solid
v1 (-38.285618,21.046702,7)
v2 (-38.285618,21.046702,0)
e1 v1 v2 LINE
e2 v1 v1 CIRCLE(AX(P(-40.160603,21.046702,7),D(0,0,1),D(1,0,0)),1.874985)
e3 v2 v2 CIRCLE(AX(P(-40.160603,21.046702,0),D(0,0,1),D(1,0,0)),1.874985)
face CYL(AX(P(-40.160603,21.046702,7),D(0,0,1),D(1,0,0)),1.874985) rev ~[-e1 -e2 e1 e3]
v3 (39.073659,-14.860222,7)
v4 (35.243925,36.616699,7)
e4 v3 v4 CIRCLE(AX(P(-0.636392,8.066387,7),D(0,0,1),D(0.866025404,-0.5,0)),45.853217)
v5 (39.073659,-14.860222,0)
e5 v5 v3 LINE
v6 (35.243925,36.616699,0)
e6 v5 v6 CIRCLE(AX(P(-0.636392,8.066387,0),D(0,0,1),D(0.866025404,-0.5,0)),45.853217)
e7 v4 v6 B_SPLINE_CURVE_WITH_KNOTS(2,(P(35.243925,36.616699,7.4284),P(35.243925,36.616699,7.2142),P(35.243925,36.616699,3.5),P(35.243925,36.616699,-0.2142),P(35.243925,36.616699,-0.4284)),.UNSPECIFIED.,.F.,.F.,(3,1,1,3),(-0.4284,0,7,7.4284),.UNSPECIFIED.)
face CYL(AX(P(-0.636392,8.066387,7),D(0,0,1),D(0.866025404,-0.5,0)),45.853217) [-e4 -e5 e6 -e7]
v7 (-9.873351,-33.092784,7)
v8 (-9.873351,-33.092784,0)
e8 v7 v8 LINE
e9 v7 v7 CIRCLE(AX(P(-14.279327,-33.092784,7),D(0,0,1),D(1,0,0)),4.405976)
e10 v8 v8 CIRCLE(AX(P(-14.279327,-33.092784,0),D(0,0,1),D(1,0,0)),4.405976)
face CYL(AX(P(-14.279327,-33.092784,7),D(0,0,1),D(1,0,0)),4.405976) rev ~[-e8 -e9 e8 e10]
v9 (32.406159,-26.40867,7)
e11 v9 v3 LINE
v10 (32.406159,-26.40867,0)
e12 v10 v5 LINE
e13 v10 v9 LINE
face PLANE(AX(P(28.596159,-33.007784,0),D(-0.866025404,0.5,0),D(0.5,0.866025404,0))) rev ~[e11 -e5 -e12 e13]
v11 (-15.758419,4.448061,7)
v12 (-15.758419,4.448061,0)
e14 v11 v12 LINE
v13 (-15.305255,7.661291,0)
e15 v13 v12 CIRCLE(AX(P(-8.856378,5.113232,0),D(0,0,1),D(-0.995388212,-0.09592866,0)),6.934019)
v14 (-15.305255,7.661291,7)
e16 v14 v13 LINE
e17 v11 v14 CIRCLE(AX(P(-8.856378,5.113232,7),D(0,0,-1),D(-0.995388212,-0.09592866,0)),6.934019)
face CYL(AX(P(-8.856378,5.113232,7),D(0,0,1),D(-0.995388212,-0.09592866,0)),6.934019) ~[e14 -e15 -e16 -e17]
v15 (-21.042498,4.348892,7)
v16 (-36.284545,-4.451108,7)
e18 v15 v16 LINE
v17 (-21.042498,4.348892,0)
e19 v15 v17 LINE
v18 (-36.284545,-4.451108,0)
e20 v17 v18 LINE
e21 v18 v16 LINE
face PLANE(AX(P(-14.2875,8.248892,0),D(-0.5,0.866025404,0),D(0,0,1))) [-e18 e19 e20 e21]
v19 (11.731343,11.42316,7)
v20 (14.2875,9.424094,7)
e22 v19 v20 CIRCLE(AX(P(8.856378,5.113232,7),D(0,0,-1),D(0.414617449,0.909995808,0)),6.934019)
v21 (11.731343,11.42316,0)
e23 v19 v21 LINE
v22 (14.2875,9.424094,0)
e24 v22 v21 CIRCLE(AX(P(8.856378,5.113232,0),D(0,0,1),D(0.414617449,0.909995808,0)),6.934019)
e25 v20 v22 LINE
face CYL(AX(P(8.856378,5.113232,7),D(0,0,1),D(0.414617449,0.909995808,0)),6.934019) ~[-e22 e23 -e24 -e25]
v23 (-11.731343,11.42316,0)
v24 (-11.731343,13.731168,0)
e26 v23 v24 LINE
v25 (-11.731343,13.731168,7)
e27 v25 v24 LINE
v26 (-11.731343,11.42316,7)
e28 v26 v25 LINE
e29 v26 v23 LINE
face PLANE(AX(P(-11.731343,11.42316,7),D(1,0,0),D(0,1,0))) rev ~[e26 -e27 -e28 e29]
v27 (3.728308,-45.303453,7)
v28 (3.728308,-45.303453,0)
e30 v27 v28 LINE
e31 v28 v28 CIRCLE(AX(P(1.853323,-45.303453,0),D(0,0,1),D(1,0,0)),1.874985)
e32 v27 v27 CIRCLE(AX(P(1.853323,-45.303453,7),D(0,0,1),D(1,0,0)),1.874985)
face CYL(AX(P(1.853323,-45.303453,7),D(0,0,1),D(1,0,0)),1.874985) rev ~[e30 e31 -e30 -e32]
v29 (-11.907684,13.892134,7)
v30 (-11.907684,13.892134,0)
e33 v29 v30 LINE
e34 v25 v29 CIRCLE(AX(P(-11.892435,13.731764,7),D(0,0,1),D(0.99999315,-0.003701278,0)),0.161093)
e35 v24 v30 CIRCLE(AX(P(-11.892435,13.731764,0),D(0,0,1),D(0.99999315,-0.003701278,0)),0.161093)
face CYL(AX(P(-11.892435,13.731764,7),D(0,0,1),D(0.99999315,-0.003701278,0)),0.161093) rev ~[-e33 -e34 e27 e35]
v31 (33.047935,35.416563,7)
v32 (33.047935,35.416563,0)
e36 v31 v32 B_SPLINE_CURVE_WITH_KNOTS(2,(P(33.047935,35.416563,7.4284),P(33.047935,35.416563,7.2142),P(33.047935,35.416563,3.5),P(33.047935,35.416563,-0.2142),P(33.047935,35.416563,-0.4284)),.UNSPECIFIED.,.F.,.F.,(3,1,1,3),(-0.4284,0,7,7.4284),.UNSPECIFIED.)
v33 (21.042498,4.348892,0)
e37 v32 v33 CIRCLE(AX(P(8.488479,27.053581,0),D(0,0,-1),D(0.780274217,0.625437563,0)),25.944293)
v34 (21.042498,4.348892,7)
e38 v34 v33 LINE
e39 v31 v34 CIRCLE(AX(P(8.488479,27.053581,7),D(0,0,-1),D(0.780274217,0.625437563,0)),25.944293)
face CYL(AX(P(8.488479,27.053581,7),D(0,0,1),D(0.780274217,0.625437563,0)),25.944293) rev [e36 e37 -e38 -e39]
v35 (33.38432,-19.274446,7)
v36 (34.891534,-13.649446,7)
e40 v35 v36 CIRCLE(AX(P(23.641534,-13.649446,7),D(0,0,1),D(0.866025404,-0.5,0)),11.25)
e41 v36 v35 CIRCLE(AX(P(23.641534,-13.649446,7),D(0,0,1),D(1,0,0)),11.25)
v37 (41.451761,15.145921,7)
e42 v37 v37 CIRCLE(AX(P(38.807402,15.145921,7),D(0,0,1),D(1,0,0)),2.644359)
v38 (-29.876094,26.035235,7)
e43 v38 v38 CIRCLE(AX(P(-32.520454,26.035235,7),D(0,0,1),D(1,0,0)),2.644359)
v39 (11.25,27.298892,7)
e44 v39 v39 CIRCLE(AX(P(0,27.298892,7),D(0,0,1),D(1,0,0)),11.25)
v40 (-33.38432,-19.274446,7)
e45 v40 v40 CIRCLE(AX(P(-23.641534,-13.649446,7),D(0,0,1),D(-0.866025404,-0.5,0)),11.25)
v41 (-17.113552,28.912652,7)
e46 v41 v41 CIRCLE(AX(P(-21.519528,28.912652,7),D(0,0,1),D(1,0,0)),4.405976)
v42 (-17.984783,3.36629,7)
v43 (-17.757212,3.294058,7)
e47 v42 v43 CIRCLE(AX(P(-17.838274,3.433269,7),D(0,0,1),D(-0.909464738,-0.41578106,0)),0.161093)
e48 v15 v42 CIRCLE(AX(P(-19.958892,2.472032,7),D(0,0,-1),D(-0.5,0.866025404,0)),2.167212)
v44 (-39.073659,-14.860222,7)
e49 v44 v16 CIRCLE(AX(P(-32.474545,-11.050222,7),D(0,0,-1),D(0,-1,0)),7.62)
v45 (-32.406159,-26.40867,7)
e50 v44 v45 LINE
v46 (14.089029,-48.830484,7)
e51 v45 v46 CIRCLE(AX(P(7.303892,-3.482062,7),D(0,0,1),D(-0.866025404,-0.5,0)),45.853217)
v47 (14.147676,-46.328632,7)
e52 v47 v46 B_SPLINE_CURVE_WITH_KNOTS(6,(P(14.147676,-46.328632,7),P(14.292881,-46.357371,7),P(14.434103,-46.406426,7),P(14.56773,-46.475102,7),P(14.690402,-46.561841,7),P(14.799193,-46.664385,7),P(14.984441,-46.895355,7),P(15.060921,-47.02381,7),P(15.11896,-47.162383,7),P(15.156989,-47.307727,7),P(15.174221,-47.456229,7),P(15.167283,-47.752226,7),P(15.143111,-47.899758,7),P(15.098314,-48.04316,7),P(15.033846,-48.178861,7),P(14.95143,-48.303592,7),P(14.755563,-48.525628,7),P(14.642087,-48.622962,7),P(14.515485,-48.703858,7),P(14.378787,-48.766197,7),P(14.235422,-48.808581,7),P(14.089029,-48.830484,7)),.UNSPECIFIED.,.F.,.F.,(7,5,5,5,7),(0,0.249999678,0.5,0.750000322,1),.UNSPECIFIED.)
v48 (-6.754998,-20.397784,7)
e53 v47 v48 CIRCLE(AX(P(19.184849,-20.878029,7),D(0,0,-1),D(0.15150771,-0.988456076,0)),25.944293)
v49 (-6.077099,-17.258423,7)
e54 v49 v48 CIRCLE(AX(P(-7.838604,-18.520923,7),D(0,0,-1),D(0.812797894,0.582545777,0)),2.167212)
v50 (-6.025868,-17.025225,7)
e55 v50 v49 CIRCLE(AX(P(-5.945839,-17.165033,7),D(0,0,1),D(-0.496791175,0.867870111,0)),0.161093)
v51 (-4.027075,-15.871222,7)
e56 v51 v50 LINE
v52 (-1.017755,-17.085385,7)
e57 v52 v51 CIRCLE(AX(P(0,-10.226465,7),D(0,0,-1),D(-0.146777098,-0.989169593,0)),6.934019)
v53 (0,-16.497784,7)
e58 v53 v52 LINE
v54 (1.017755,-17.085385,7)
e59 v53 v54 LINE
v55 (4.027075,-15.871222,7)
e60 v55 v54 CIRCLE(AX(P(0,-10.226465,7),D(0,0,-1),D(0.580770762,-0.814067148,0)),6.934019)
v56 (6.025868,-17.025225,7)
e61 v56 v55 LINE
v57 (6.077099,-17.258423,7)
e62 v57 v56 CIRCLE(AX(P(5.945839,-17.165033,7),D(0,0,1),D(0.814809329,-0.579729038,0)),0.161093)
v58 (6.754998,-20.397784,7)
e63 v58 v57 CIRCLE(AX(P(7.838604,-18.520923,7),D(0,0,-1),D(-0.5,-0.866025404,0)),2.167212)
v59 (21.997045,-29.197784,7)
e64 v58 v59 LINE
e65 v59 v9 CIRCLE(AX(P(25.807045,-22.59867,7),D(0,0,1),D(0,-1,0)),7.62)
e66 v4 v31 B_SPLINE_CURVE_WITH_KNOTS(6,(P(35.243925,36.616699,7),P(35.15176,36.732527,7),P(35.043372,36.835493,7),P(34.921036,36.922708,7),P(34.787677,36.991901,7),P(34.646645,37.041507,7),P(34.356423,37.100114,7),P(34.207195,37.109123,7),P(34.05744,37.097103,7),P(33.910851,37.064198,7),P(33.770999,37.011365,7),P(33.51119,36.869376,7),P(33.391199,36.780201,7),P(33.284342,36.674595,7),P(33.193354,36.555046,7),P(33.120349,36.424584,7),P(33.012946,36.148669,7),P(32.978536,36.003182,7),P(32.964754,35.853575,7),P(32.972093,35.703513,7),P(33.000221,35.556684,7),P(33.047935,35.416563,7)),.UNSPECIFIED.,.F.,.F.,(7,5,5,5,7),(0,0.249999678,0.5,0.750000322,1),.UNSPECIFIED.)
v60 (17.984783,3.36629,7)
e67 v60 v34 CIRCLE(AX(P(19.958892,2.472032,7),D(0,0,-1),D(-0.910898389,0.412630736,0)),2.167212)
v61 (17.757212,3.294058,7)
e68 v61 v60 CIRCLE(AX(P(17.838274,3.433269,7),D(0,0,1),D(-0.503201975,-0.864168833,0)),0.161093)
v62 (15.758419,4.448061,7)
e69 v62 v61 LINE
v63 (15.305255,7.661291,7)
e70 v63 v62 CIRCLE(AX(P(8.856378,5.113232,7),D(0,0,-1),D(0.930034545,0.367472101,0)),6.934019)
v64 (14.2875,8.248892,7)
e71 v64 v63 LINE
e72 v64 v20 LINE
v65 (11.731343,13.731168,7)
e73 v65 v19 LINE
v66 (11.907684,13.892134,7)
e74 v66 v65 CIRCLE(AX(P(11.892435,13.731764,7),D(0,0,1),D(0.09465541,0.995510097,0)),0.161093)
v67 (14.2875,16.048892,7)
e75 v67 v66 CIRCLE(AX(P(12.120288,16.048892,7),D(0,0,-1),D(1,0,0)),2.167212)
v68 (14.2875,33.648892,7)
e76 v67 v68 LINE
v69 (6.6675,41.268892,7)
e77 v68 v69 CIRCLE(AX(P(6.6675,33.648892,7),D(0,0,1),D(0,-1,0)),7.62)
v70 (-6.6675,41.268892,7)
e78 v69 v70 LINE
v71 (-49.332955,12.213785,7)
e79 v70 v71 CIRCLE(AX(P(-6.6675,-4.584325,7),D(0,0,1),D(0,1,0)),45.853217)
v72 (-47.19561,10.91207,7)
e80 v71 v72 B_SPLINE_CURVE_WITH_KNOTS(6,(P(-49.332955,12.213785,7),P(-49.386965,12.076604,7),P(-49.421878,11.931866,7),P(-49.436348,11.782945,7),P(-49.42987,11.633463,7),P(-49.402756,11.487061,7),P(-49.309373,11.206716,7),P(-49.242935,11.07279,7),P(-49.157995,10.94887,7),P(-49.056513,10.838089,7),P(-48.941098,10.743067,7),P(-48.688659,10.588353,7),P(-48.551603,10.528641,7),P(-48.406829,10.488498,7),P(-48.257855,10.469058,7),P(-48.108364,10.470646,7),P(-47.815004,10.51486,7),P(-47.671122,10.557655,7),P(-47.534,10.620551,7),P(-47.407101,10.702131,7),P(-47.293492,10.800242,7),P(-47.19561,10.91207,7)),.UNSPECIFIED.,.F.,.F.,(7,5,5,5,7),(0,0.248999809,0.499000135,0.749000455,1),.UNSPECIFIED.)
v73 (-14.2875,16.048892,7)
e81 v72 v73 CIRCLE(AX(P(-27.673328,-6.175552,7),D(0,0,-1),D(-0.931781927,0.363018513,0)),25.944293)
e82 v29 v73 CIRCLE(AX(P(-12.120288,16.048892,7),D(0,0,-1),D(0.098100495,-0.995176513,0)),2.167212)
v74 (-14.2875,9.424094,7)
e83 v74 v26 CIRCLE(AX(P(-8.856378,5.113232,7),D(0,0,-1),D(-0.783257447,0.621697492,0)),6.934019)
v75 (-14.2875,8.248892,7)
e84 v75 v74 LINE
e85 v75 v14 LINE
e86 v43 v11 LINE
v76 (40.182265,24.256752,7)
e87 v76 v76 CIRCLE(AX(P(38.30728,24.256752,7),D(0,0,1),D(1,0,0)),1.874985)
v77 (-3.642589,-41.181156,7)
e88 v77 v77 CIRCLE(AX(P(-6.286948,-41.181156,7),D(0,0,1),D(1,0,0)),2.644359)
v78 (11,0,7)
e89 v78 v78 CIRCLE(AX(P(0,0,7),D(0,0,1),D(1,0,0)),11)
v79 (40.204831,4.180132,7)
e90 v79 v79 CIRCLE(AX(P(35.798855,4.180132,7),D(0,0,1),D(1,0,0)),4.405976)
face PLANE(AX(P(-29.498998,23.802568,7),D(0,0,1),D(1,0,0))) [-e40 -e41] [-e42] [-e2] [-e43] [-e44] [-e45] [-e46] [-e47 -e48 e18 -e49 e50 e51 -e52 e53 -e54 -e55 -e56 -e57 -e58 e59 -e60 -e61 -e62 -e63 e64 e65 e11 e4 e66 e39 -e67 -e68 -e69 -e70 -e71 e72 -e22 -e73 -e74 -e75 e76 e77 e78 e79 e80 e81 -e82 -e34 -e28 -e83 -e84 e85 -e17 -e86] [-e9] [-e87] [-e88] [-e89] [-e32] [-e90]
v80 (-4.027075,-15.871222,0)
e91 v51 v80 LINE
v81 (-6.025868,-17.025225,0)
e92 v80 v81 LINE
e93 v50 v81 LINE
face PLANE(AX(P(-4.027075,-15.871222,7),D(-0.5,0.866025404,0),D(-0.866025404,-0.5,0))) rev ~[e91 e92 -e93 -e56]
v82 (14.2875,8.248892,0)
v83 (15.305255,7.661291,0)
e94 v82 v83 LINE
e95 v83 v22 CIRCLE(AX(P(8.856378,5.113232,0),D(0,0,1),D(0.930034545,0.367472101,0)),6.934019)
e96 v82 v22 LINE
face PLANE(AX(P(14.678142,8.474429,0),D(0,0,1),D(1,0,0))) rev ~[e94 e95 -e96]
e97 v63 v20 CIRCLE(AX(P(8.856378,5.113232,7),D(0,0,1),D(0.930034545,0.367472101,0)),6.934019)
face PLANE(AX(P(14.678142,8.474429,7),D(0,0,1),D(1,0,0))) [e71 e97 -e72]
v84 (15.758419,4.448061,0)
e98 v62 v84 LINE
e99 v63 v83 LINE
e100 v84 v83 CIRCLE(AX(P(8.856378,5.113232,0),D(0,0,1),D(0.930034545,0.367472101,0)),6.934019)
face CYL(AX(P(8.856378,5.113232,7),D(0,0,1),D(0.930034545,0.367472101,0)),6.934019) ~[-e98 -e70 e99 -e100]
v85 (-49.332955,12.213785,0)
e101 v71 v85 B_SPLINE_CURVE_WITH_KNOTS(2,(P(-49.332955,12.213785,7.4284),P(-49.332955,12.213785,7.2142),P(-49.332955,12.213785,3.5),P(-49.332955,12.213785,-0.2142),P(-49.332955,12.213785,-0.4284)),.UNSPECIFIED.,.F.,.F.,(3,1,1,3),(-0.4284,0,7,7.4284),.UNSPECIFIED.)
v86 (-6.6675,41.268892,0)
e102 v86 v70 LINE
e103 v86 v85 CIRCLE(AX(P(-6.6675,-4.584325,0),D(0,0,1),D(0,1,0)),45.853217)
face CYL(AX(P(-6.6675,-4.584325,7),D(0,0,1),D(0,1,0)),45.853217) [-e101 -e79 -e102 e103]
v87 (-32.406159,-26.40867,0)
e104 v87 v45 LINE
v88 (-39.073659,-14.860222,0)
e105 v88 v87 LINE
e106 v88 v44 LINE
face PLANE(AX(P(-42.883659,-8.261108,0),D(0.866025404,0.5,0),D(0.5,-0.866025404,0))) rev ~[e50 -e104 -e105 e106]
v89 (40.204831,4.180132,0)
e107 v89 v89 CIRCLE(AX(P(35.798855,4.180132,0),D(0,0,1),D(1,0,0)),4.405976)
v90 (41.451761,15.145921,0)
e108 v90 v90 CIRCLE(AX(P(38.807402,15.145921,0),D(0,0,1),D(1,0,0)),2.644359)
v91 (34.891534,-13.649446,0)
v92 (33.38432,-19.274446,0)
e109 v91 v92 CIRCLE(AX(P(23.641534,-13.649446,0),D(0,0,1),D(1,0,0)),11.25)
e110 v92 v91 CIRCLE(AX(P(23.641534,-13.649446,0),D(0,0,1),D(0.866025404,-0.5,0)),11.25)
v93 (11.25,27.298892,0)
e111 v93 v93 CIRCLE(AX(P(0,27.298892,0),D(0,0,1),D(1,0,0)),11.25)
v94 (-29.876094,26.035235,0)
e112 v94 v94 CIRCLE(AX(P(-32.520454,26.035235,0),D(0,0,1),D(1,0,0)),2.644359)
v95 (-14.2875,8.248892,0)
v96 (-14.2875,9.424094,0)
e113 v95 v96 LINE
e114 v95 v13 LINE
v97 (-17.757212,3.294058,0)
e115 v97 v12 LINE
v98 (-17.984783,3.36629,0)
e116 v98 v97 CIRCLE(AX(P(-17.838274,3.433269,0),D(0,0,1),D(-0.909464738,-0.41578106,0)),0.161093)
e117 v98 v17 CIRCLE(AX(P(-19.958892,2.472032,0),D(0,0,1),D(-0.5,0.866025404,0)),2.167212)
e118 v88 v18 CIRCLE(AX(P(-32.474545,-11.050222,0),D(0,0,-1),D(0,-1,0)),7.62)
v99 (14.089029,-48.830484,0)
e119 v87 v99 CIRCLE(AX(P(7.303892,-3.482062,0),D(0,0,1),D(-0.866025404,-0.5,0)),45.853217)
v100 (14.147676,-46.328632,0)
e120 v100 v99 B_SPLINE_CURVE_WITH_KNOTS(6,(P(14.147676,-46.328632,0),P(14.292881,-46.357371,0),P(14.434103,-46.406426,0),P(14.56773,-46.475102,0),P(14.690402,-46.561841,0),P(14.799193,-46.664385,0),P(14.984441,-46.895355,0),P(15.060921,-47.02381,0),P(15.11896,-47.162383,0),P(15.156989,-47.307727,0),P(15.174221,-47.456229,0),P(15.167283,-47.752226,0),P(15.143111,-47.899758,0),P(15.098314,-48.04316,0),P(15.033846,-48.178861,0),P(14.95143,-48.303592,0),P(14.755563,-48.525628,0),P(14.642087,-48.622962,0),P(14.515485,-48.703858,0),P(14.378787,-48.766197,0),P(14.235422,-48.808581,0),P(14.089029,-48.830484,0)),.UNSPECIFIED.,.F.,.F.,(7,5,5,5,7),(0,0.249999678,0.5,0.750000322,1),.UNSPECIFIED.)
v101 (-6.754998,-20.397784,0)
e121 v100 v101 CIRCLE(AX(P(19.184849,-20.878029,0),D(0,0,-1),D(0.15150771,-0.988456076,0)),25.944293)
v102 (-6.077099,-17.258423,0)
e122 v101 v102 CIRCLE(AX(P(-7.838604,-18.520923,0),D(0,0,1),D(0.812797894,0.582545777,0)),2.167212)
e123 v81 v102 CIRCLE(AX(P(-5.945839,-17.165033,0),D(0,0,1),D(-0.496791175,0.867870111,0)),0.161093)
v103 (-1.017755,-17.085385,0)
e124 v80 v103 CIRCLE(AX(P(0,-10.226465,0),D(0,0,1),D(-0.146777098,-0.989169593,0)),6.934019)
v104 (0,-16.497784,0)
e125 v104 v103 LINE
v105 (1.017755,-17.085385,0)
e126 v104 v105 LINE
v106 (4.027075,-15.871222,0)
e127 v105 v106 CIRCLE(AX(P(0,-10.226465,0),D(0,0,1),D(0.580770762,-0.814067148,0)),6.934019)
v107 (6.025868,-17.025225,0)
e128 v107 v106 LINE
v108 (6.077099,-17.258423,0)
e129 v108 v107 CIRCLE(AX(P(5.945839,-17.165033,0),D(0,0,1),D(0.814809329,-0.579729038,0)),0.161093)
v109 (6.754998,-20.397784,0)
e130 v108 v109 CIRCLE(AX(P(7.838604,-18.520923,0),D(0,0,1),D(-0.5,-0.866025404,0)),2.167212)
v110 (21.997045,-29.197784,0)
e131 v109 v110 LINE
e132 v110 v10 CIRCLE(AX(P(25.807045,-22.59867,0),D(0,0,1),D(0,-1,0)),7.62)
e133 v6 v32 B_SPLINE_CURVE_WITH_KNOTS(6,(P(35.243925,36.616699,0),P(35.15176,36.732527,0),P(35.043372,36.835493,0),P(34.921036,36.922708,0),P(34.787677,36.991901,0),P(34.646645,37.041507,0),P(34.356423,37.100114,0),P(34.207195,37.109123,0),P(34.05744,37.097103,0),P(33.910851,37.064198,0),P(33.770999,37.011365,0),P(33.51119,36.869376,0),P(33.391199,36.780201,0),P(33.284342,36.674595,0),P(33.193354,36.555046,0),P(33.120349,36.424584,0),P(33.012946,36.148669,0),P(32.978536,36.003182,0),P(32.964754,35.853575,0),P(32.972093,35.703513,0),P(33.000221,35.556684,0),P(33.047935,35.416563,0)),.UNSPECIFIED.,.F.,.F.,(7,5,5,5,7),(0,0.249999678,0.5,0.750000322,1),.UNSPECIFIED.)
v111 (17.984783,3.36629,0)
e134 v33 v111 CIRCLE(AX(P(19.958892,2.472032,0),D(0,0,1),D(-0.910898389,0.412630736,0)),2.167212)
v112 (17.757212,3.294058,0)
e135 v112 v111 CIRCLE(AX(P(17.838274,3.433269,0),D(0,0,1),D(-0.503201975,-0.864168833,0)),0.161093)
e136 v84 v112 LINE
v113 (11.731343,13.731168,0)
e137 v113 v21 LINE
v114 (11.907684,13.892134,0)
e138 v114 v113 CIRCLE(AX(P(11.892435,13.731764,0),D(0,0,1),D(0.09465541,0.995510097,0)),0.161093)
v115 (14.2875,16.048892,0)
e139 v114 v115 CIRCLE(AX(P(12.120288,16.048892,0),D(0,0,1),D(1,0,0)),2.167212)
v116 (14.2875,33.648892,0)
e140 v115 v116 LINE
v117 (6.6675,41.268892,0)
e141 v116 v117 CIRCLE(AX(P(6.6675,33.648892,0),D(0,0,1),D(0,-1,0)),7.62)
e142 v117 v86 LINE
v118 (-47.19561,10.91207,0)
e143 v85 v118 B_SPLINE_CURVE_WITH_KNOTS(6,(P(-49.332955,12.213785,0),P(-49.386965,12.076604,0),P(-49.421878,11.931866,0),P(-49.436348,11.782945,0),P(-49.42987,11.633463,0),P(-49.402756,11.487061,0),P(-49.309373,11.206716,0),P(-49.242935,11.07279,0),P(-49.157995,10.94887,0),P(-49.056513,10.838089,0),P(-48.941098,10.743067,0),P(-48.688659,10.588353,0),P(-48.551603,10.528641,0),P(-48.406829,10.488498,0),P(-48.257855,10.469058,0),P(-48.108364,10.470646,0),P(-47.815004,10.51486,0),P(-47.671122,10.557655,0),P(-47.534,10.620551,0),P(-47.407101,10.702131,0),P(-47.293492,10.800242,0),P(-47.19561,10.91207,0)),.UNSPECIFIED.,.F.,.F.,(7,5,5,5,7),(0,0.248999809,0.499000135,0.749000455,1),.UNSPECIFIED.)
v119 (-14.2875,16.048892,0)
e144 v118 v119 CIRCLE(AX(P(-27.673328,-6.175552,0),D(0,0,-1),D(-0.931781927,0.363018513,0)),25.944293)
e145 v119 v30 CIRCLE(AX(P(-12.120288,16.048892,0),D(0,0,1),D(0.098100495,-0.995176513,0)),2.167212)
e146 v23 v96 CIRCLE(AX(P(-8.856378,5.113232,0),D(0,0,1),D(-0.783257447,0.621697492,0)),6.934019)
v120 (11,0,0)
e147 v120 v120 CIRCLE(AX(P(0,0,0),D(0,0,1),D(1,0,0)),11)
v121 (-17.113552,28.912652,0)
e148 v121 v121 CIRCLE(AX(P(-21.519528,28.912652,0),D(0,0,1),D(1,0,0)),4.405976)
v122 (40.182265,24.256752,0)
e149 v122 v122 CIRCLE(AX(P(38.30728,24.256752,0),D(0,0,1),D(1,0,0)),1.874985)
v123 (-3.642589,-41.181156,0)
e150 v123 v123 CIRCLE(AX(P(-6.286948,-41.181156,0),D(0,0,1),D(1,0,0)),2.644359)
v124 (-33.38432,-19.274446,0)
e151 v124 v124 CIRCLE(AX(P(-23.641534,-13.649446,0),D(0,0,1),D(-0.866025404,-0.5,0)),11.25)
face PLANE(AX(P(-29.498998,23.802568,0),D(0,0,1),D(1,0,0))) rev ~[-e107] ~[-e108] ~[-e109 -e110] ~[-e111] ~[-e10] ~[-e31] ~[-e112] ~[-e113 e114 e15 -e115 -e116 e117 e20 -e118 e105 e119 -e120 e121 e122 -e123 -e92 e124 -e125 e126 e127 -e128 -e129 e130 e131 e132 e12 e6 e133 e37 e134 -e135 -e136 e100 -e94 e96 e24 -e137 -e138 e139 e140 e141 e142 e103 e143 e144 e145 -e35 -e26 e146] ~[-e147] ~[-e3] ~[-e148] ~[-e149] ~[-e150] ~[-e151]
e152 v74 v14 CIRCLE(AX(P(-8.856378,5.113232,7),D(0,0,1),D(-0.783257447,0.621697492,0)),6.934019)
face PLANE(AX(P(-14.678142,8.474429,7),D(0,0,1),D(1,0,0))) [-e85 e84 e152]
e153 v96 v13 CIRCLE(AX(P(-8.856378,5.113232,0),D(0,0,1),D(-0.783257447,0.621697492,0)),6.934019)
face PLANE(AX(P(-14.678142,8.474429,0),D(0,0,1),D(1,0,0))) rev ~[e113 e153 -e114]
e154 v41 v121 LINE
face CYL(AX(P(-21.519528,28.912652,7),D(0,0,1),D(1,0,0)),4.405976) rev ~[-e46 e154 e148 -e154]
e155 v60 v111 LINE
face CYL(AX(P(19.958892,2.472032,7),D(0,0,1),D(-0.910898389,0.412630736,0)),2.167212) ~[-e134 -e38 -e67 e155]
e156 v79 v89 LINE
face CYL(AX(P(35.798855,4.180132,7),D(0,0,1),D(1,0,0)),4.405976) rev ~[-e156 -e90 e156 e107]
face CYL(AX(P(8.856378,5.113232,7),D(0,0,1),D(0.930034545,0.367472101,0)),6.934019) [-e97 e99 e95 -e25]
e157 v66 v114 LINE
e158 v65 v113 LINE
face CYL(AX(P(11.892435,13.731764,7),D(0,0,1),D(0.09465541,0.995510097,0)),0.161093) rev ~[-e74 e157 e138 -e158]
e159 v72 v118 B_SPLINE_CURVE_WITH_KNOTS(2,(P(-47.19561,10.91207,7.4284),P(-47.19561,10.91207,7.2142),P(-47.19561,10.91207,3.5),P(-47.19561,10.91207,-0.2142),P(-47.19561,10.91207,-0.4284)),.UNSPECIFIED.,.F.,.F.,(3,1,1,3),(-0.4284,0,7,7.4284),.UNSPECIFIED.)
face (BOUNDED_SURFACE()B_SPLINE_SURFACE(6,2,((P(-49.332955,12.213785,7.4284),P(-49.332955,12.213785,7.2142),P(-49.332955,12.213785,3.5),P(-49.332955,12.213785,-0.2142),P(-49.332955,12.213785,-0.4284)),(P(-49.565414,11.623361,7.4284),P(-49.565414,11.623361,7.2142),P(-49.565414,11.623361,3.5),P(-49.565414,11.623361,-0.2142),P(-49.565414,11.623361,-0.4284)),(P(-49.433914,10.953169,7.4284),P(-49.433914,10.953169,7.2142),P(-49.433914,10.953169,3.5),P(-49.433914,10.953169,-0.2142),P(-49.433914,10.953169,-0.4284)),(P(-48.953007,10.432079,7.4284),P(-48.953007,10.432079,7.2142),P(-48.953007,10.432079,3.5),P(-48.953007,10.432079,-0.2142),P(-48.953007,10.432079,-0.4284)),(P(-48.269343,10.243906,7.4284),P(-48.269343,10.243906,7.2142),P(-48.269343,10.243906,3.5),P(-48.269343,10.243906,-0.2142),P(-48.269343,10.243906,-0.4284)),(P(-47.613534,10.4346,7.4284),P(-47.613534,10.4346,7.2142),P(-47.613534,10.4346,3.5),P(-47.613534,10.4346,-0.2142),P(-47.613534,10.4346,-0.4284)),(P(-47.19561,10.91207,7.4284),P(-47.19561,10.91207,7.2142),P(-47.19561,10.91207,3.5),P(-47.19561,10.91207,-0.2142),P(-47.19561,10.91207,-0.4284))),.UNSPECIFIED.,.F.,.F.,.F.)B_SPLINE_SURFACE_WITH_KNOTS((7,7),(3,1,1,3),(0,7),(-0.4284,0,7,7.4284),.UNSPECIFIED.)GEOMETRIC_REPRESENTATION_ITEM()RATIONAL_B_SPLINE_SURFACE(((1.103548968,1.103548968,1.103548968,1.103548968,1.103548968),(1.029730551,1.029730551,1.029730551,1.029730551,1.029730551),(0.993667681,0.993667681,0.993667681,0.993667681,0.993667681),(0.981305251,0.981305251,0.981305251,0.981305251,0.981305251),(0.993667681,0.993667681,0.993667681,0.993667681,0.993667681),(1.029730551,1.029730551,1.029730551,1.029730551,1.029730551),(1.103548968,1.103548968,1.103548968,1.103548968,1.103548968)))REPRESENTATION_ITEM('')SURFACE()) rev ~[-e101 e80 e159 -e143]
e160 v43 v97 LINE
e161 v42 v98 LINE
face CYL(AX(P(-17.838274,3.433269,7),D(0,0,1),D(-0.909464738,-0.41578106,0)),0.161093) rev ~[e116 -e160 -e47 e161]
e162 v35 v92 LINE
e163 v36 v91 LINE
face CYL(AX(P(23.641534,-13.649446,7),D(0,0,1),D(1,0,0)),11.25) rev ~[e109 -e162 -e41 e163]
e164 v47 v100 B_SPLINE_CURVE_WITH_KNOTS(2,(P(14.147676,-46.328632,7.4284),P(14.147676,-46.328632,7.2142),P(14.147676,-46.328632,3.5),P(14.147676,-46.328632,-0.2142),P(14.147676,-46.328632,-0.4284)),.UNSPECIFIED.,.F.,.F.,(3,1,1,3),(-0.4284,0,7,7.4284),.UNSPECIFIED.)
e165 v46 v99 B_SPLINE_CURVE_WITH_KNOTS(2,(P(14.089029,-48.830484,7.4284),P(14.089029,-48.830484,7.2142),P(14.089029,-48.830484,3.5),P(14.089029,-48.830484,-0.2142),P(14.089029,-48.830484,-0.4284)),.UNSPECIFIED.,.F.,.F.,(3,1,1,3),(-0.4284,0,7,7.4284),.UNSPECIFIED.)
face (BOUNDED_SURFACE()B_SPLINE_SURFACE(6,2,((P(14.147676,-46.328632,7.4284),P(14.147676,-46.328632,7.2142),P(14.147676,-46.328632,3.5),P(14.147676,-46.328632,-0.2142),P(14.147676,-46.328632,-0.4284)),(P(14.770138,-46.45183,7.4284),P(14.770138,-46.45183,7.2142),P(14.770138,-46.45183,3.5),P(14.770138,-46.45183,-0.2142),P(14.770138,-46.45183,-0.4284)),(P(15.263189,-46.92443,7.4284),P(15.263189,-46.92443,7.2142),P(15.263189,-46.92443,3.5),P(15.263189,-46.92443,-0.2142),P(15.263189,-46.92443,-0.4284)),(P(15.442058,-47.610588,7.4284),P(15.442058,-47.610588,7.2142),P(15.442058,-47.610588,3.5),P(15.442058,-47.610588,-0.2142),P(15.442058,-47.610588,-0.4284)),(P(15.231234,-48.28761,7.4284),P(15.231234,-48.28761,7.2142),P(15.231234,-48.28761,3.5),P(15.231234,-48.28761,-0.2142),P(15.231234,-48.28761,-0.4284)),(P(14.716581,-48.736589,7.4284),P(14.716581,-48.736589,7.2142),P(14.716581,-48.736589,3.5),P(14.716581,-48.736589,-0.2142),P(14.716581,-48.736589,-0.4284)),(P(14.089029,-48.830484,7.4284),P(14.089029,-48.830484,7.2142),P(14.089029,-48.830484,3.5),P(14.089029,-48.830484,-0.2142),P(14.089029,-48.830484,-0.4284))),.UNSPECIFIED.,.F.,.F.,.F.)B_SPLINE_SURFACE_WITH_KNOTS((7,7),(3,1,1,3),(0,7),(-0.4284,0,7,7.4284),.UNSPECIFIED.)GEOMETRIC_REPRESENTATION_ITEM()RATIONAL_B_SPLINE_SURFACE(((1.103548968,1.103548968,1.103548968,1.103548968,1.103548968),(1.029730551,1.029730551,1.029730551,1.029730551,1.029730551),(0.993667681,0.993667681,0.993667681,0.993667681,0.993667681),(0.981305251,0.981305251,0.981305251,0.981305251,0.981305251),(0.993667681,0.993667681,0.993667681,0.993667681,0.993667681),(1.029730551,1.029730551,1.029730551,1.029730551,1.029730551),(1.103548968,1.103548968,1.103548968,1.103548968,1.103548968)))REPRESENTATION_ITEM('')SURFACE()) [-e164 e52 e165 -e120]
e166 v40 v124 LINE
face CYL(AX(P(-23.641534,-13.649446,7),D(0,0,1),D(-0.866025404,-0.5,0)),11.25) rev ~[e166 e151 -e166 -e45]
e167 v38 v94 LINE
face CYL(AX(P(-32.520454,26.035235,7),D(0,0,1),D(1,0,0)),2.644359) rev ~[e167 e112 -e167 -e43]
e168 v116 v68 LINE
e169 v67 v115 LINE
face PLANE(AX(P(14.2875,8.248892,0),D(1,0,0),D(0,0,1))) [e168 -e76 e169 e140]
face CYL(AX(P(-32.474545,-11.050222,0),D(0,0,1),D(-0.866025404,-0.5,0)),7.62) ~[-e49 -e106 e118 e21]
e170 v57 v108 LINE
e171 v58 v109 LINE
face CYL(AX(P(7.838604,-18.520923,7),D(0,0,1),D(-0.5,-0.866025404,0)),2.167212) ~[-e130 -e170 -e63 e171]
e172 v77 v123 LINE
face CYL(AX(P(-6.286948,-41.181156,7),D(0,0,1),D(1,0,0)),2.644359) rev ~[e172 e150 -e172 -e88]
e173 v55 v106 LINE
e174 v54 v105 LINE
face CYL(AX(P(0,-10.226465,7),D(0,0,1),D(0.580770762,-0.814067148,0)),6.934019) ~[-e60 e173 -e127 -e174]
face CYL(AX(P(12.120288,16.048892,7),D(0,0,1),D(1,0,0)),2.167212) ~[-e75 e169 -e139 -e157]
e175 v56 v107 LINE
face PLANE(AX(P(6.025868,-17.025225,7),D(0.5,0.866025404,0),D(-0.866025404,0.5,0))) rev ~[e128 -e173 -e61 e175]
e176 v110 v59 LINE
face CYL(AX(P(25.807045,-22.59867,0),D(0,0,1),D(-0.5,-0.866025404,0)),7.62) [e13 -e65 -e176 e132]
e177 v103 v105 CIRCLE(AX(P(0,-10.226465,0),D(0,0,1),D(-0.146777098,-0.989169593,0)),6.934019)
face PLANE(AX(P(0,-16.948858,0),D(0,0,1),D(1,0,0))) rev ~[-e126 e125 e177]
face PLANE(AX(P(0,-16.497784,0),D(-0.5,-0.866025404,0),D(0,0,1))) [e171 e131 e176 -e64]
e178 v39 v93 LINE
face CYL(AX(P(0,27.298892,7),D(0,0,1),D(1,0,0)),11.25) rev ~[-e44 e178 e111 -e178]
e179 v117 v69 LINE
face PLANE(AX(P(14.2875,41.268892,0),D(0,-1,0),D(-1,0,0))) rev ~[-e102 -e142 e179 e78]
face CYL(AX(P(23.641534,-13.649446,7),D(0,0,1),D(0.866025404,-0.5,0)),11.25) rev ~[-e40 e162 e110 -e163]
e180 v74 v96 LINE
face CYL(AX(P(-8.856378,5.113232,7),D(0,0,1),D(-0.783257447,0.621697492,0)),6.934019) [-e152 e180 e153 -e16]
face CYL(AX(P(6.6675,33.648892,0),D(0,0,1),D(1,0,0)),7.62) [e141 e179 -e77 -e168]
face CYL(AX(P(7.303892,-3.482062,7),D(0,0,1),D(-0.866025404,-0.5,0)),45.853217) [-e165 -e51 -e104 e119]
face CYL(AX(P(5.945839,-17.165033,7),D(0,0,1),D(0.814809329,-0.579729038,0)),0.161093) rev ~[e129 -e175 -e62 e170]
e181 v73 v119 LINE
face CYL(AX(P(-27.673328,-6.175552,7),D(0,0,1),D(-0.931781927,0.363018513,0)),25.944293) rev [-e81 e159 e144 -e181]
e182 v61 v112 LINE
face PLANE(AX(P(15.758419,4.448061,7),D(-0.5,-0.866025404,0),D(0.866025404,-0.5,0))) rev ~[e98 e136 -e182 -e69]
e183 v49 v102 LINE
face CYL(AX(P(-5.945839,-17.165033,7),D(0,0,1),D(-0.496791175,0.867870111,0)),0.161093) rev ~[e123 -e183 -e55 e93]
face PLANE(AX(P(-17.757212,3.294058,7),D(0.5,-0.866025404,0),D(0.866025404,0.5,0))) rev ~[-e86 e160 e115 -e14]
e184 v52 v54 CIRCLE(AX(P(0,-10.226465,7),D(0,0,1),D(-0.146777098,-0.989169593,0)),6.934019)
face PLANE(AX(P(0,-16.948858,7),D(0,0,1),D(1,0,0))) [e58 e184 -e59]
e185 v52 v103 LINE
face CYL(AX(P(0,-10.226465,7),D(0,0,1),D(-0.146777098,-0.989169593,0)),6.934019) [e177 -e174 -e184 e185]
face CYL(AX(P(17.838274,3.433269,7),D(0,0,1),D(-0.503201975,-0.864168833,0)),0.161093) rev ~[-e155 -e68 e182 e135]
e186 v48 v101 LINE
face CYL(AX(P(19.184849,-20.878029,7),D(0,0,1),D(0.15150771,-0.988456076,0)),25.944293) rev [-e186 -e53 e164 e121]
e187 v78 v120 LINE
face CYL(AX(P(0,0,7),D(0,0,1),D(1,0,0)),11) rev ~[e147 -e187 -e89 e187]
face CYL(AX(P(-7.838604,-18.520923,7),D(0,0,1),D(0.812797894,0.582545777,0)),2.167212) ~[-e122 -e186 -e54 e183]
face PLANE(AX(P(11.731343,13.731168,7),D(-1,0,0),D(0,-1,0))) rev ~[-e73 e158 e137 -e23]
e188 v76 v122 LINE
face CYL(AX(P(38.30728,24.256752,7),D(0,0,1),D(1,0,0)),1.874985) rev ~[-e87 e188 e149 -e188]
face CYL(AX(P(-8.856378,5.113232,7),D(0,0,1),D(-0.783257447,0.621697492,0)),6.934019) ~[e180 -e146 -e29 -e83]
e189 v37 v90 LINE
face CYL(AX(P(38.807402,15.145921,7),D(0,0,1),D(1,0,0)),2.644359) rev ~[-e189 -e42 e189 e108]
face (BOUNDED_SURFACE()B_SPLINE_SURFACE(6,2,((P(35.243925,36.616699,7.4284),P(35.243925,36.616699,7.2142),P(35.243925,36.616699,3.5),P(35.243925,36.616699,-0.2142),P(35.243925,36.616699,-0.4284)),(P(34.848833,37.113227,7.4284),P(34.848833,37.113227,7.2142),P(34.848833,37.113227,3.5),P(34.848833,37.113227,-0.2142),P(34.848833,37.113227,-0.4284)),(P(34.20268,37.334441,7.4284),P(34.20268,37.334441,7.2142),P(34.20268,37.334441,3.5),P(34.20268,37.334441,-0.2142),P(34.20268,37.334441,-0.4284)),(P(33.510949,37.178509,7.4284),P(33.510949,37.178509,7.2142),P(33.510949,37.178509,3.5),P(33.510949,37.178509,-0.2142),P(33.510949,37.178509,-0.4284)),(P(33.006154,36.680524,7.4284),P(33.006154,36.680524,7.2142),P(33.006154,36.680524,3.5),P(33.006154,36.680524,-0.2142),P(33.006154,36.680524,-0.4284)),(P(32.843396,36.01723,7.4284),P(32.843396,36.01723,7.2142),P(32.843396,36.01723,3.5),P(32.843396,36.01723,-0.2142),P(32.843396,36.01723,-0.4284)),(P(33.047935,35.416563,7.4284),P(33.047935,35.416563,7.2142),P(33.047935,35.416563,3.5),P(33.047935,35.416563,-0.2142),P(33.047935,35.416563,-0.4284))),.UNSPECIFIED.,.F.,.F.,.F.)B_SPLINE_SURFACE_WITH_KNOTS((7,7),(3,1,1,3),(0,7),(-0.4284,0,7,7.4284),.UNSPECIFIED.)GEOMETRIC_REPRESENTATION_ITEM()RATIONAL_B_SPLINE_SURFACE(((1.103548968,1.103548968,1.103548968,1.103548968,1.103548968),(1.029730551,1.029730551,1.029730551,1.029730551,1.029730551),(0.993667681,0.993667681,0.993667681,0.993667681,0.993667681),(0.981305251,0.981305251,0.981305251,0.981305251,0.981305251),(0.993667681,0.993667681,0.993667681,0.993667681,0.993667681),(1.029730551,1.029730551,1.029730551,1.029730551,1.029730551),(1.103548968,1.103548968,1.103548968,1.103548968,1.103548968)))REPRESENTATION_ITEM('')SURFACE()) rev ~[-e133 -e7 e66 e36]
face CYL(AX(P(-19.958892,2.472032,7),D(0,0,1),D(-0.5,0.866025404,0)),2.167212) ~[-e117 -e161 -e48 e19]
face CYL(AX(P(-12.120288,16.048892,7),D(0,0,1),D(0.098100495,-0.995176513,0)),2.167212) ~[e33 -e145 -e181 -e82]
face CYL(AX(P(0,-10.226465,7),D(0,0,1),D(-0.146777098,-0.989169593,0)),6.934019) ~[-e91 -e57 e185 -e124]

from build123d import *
from build123d import SkipClean  # not in build123d's __all__

# Parameters (mm, degrees)
F1_DEPTH  = 7
F2_DEPTH  = 33.02
F3_DEPTH  = 33.02
F4_DEPTH  = 33.02
F6_R      = 7.62
F5_R      = 11.25
F5_R_2    = 11
F7_DEPTH  = 25.4
F8_R      = 1.8749848785
F8_R_2    = 2.6443594024
F8_R_3    = 4.4059759684
F9_DEPTH  = 7
F10_R     = 1.27
F12_DEPTH = 25.4
F13_DEPTH = 7


with BuildPart() as f1:
    # F0 (on Top) → F1 (new body)
    with BuildSketch(Plane.XY):
        Polygon((14.2875, 8.248891971), (-14.2875, 8.248891971), (0, -16.4977839421), align=None)
    extrude(amount=F1_DEPTH)

    # F2 (add): a face of the model
    f2_faces = [f1.faces().sort_by_distance(p)[0] for p in [
        (-7.14375, -4.1244459855, 3.5),
    ]]
    extrude(f2_faces, amount=F2_DEPTH)

    # F3 (add): a face of the model
    f3_faces = [f1.faces().sort_by_distance(p)[0] for p in [
        (0, 8.248891971, 3.5),
    ]]
    extrude(f3_faces, amount=F3_DEPTH)

    # F4 (add): a face of the model
    f4_faces = [f1.faces().sort_by_distance(p)[0] for p in [
        (7.14375, -4.1244459855, 3.5),
    ]]
    extrude(f4_faces, amount=F4_DEPTH)

    # F6
    f6_edges = [f1.edges().sort_by_distance(p)[0] for p in [
        (-42.883659, -8.261108, 3.5),
        (-28.596159, -33.007784, 3.5),
        (28.596159, -33.007784, 3.5),
        (42.883659, -8.261108, 3.5),
        (14.2875, 41.268892, 3.5),
        (-14.2875, 41.268892, 3.5),
    ]]
    fillet(f6_edges, radius=F6_R)

    # F5 (on face) → F7 (cut)
    with BuildSketch(Plane.XY.offset(7)):
        with Locations((0, 27.298891971)):
            Circle(F5_R)
        Circle(F5_R_2)
        with BuildLine():
            ThreePointArc((34.8915339421, -13.6494459855), (12.7748683963, -10.7377317281), (33.3843197347, -19.2744459855))
            ThreePointArc((33.3843197347, -19.2744459855), (34.5081994878, -16.5611602429), (34.8915339421, -13.6494459855))
        make_face()
        with BuildLine():
            ThreePointArc((-12.3915339421, -13.6494459855), (-26.5532481995, -2.7827804398), (-33.3843197347, -19.2744459855))
            ThreePointArc((-33.3843197347, -19.2744459855), (-20.7298196847, -24.5161115313), (-12.3915339421, -13.6494459855))
        make_face()
    extrude(amount=-F7_DEPTH, mode=Mode.SUBTRACT)

    # F8 (on face) → F9 (join)
    with BuildSketch(Plane.XY.offset(7)):
        with BuildLine():
            ThreePointArc((-14.2875, 33.648891971), (-12.0556536726, 39.0370456437), (-6.6675, 41.268891971))
            ThreePointArc((-6.6675, 41.268891971), (-36.1939537613, 30.4970950948), (-51.8477511168, 3.2427063104))
            ThreePointArc((-51.8477511168, 3.2427063104), (-36.0457855424, 18.3806746008), (-14.2875, 16.048891971))
            Line((-14.2875, 16.048891971), (-14.2875, 33.648891971))
        make_face()
        with Locations((-40.1606029761, 21.0467017921)):
            Circle(F8_R, mode=Mode.SUBTRACT)
        with Locations((-32.5204535481, 26.0352350988)):
            Circle(F8_R_2, mode=Mode.SUBTRACT)
        with Locations((-21.5195283201, 28.9126522448)):
            Circle(F8_R_3, mode=Mode.SUBTRACT)
        with BuildLine():
            ThreePointArc((23.1156095166, -46.5228227514), (2.1047616282, -40.4069032795), (-6.7549981495, -20.3977839421))
            Line((-6.7549981495, -20.3977839421), (-21.9970452561, -29.1977839421))
            ThreePointArc((-21.9970452561, -29.1977839421), (-27.7792463798, -29.9590251616), (-32.406158833, -26.4086703653))
            ThreePointArc((-32.406158833, -26.4086703653), (-8.3142822131, -46.5934309681), (23.1156095166, -46.5228227514))
        make_face()
        with Locations((-6.286948215, -41.1811564646)):
            Circle(F8_R_2, mode=Mode.SUBTRACT)
        with Locations((-14.2793271748, -33.092784325)):
            Circle(F8_R_3, mode=Mode.SUBTRACT)
        with Locations((1.8533230702, -45.3034533047)):
            Circle(F8_R, mode=Mode.SUBTRACT)
        with BuildLine():
            Line((21.0424981495, 4.348891971), (21.3499965498, 4.1713576869))
            Line((21.3499965498, 4.1713576869), (36.2845452561, -4.451108029))
            ThreePointArc((36.2845452561, -4.451108029), (39.8349000524, -9.0780204821), (39.073658833, -14.8602216058))
            ThreePointArc((39.073658833, -14.8602216058), (44.5082359744, 16.0963358733), (28.7321416002, 43.280116441))
            ThreePointArc((28.7321416002, 43.280116441), (33.9410239142, 22.0262286786), (21.0424981495, 4.348891971))
        make_face()
        with Locations((35.7988554948, 4.1801320802)):
            Circle(F8_R_3, mode=Mode.SUBTRACT)
        with Locations((38.8074017631, 15.1459213658)):
            Circle(F8_R_2, mode=Mode.SUBTRACT)
        with Locations((38.3072799059, 24.2567515126)):
            Circle(F8_R, mode=Mode.SUBTRACT)
    extrude(amount=-F9_DEPTH)

    # F10
    f10_edges = [f1.edges().sort_by_distance(p)[0] for p in [
        (28.732142, 43.280116, 3.5),
        (23.11561, -46.522823, 3.5),
        (-51.847751, 3.242706, 3.5),
    ]]
    fillet(f10_edges, radius=F10_R)

    # F11 (on face) → F12 (cut)
    with BuildSketch(Plane.XY.offset(7)):
        with BuildLine():
            ThreePointArc((-15.7584187023, 4.4480611953), (-15.7224513331, 6.0815584331), (-15.3052551523, 7.6612907599))
            Line((-15.3052551523, 7.6612907599), (-21.0424981495, 4.348891971))
            ThreePointArc((-21.0424981495, 4.348891971), (-19.2958492313, 4.5353251977), (-17.9847825572, 3.3662897117))
            ThreePointArc((-17.9847825572, 3.3662897117), (-17.8870097802, 3.2797249828), (-17.7572116819, 3.2940575304))
            Line((-17.7572116819, 3.2940575304), (-15.7584187023, 4.4480611953))
        make_face()
        with BuildLine():
            ThreePointArc((-11.9076836854, 13.8921337202), (-13.5756314513, 14.443033023), (-14.2875, 16.048891971))
            Line((-14.2875, 16.048891971), (-14.2875, 9.4240943934))
            ThreePointArc((-14.2875, 9.4240943934), (-13.1280097642, 10.5752630477), (-11.7313433439, 11.423160322))
            Line((-11.7313433439, 11.423160322), (-11.7313433439, 13.7311676517))
            ThreePointArc((-11.7313433439, 13.7311676517), (-11.7838300426, 13.850742376), (-11.9076836854, 13.8921337202))
        make_face()
        with BuildLine():
            ThreePointArc((-6.0770988718, -17.2584234319), (-5.72021778, -18.9783582208), (-6.7549981495, -20.3977839421))
            Line((-6.7549981495, -20.3977839421), (-1.0177551523, -17.0853851533))
            ThreePointArc((-1.0177551523, -17.0853851533), (-2.5944415689, -16.6568214807), (-4.0270753584, -15.8712215173))
            Line((-4.0270753584, -15.8712215173), (-6.0258683381, -17.0252251822))
            ThreePointArc((-6.0258683381, -17.0252251822), (-6.1031797376, -17.1304673587), (-6.0770988718, -17.2584234319))
        make_face()
        with BuildLine():
            ThreePointArc((4.0270753584, -15.8712215173), (2.5944415689, -16.6568214807), (1.0177551523, -17.0853851533))
            Line((1.0177551523, -17.0853851533), (6.7549981495, -20.3977839421))
            ThreePointArc((6.7549981495, -20.3977839421), (5.72021778, -18.9783582208), (6.0770988718, -17.2584234319))
            ThreePointArc((6.0770988718, -17.2584234319), (6.1031797376, -17.1304673587), (6.0258683381, -17.0252251822))
            Line((6.0258683381, -17.0252251822), (4.0270753584, -15.8712215173))
        make_face()
        with BuildLine():
            Line((21.0424981495, 4.348891971), (15.3052551523, 7.6612907599))
            ThreePointArc((15.3052551523, 7.6612907599), (15.7224513331, 6.0815584331), (15.7584187023, 4.4480611953))
            Line((15.7584187023, 4.4480611953), (17.7572116819, 3.2940575304))
            ThreePointArc((17.7572116819, 3.2940575304), (17.8870097802, 3.2797249828), (17.9847825572, 3.3662897117))
            ThreePointArc((17.9847825572, 3.3662897117), (19.2958492313, 4.5353251977), (21.0424981495, 4.348891971))
        make_face()
        with BuildLine():
            Line((14.2875, 9.4240943934), (14.2875, 16.048891971))
            ThreePointArc((14.2875, 16.048891971), (13.5756314513, 14.443033023), (11.9076836854, 13.8921337202))
            ThreePointArc((11.9076836854, 13.8921337202), (11.7838300426, 13.850742376), (11.7313433439, 13.7311676517))
            Line((11.7313433439, 13.7311676517), (11.7313433439, 11.423160322))
            ThreePointArc((11.7313433439, 11.423160322), (13.1280097642, 10.5752630477), (14.2875, 9.4240943934))
        make_face()
    extrude(amount=-F12_DEPTH, mode=Mode.SUBTRACT)

    # F11 (on face) → F13 (join)
    with BuildSketch(Plane.XY.offset(7)):
        with BuildLine():
            Line((-14.2875, 8.248891971), (-14.2875, 9.4240943934))
            ThreePointArc((-14.2875, 9.4240943934), (-14.8614145652, 8.5802416998), (-15.3052551523, 7.6612907599))
            Line((-15.3052551523, 7.6612907599), (-14.2875, 8.248891971))
        make_face()
        with BuildLine():
            Line((0, -16.4977839421), (-1.0177551523, -17.0853851533))
            ThreePointArc((-1.0177551523, -17.0853851533), (0, -17.1604833996), (1.0177551523, -17.0853851533))
            Line((1.0177551523, -17.0853851533), (0, -16.4977839421))
        make_face()
        with BuildLine():
            ThreePointArc((15.3052551523, 7.6612907599), (14.8614145652, 8.5802416998), (14.2875, 9.4240943934))
            Line((14.2875, 9.4240943934), (14.2875, 8.248891971))
            Line((14.2875, 8.248891971), (15.3052551523, 7.6612907599))
        make_face()
    with SkipClean():  # cleaning this boolean's faces spoils the solid; the shape is the same uncleaned
        extrude(amount=-F13_DEPTH)


solid = f1.part
